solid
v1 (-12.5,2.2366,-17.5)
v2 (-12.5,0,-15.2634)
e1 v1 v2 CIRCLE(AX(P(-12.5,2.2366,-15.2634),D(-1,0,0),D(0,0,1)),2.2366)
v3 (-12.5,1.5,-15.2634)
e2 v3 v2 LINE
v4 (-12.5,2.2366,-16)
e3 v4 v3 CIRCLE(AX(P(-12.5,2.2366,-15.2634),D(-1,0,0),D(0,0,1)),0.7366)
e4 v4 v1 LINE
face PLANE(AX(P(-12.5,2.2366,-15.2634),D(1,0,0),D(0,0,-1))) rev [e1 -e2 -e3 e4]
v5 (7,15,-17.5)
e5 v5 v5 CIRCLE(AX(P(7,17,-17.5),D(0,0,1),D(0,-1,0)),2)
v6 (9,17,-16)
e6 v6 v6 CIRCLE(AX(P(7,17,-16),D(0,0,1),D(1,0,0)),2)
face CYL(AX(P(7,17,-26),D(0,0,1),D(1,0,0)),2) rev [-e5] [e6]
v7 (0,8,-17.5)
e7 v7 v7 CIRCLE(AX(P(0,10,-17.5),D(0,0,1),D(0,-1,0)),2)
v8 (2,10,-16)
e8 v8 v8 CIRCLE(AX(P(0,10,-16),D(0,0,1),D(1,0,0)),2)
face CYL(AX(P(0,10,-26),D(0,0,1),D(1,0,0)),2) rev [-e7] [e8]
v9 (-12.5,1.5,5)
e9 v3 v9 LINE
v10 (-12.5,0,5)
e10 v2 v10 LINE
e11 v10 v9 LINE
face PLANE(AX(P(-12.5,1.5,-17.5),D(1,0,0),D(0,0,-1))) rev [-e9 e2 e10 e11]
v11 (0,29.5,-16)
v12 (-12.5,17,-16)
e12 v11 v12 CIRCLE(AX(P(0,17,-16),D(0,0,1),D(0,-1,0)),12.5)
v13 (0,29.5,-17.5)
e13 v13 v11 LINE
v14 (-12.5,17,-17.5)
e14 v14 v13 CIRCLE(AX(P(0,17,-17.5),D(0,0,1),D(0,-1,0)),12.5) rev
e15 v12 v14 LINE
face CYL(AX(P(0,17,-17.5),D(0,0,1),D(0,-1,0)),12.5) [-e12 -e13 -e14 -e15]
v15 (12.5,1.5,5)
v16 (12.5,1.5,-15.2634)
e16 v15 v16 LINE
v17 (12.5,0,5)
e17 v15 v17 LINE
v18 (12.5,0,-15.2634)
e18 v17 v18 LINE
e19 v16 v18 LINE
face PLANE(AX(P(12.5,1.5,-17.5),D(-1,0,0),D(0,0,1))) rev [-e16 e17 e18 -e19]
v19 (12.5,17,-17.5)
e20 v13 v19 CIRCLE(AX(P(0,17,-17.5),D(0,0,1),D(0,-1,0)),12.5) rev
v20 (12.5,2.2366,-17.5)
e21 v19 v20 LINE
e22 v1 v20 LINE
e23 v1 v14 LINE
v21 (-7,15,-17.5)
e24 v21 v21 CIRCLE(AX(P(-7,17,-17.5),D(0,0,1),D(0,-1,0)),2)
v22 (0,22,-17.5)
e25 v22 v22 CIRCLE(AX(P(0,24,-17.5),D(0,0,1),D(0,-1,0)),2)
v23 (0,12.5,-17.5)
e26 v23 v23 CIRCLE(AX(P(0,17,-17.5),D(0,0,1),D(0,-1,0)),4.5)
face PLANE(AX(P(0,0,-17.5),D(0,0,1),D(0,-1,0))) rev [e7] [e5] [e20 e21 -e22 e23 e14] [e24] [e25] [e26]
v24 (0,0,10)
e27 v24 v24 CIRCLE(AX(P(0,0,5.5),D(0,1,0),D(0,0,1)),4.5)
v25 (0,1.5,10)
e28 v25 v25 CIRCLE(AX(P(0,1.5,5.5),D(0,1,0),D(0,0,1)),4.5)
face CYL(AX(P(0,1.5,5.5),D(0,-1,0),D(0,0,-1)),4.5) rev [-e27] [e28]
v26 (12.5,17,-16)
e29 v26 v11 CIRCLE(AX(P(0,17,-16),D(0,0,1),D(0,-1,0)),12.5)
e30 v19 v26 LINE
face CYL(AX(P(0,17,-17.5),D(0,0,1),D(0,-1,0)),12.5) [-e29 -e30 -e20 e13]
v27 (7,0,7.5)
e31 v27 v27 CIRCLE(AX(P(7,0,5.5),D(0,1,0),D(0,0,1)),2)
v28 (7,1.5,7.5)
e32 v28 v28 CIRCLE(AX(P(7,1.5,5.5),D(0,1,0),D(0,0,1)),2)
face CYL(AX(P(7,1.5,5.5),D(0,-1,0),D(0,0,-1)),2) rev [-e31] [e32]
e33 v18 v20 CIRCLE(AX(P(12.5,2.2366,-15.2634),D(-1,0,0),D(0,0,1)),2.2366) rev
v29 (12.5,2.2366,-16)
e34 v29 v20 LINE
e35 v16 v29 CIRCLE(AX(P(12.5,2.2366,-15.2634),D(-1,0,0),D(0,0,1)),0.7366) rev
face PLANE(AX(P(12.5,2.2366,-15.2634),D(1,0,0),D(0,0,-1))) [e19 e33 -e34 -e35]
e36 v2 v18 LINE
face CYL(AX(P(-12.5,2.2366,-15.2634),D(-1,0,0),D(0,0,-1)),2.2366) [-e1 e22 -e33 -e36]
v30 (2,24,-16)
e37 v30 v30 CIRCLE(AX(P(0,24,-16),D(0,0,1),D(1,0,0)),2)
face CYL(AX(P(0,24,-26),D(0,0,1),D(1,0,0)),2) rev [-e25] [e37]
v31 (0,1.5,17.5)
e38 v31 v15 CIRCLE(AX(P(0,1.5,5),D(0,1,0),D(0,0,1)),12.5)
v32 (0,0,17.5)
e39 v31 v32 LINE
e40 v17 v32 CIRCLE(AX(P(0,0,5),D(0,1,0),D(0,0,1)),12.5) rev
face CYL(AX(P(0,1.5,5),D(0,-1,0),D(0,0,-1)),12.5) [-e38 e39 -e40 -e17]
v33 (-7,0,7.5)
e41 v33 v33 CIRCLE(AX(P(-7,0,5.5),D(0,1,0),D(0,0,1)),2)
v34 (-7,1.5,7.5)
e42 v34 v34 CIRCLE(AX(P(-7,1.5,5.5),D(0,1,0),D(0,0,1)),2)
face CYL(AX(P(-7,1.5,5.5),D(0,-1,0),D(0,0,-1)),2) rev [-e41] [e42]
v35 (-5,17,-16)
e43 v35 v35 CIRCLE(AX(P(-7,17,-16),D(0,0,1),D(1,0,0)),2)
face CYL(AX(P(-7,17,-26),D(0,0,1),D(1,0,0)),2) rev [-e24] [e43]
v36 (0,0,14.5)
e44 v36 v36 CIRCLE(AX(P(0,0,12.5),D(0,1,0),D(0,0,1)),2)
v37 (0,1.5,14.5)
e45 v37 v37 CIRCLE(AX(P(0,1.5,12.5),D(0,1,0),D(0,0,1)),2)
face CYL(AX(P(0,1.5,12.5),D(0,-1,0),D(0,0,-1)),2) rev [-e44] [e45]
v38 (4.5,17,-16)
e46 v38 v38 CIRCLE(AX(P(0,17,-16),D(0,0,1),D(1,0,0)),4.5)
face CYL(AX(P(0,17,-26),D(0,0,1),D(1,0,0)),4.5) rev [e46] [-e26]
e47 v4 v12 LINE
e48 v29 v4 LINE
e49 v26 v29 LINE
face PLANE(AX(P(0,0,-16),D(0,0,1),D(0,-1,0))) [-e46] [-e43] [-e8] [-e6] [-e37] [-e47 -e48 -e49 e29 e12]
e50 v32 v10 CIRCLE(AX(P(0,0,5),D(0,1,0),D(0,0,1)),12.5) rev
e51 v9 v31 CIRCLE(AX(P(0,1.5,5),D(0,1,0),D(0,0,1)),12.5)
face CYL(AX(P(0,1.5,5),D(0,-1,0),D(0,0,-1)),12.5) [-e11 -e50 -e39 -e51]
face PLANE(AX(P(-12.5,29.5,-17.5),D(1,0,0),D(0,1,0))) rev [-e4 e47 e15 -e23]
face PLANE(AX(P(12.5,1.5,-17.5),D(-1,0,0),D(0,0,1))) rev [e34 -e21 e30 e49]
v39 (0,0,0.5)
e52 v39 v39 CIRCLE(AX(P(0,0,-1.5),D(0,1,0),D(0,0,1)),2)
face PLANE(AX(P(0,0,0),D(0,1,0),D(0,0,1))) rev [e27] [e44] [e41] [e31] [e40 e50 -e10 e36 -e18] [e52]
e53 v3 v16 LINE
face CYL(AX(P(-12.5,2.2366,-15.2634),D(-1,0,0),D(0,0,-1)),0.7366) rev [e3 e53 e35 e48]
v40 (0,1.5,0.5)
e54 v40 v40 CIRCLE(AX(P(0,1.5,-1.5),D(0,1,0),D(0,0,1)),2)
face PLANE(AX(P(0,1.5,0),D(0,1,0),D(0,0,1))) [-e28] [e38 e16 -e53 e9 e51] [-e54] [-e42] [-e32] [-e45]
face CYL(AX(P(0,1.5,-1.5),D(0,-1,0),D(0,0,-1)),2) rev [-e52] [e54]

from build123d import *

# Parameters (mm, degrees)
SKETCH1_W                    = 25
SKETCH1_H                    = 35
SKETCH1_R                    = 4.5
SKETCH1_R_2                  = 2
BASE_FLANGE1_DEPTH           = 1.5
EDGE_FLANGE1_STRIP_W         = 7.4732
EDGE_FLANGE1_STRIP_H         = 1.5
EDGE_FLANGE1_STRIP_CUT_DEPTH = 25
EDGE_FLANGE1_DEPTH           = 25
SKETCH9_R                    = 4.5
SKETCH9_R_2                  = 2
CUT_EXTRUDE1_DEPTH           = 10
FILLET1_R                    = 12.5


# Sheet-metal steps are written as plain solids
with BuildPart() as part:
    # Sketch1 → Base-Flange1 (new body)
    with BuildSketch(Plane(origin=(0, 0, 0), x_dir=(1, 0, 0), z_dir=(0, 1, 0))):
        Rectangle(SKETCH1_W, SKETCH1_H)
        with Locations(Location((0, -5.5, 0), (0, 0, 270))):
            Circle(SKETCH1_R, mode=Mode.SUBTRACT)
        with Locations(Location((-7, -5.5, 0), (0, 0, 270))):
            Circle(SKETCH1_R_2, mode=Mode.SUBTRACT)
        with Locations(Location((0, -12.5, 0), (0, 0, 270))):
            Circle(SKETCH1_R_2, mode=Mode.SUBTRACT)
        with Locations(Location((7, -5.5, 0), (0, 0, 270))):
            Circle(SKETCH1_R_2, mode=Mode.SUBTRACT)
        with Locations(Location((0, 1.5, 0), (0, 0, 270))):
            Circle(SKETCH1_R_2, mode=Mode.SUBTRACT)
    extrude(amount=BASE_FLANGE1_DEPTH)

    # Edge-Flange1 strip (across the edge) → Edge-Flange1 strip cut (cut)
    with BuildSketch(Plane(origin=(12.5, 1.5, -17.5), x_dir=(0, 0, 1), z_dir=(-1, 0, 0))):
        with Locations((-1.5, -0.75)):
            Rectangle(EDGE_FLANGE1_STRIP_W, EDGE_FLANGE1_STRIP_H)
    extrude(amount=EDGE_FLANGE1_STRIP_CUT_DEPTH, mode=Mode.SUBTRACT)

    # Edge-Flange1 section (across the edge) → Edge-Flange1 (add)
    with BuildSketch(Plane(origin=(12.5, 1.5, -17.5), x_dir=(0, 0, 1), z_dir=(-1, 0, 0))):
        with BuildLine():
            Line((0, 0.7366), (0, 28))
            Line((0, 28), (1.5, 28))
            Line((1.5, 28), (1.5, 0.7366))
            ThreePointArc((1.5, 0.7366), (1.715745145, 0.215745145), (2.2366, 0))
            Line((2.2366, 0), (2.2366, -1.5))
            ThreePointArc((2.2366, -1.5), (0.655084973, -0.844915027), (0, 0.7366))
        make_face()
    extrude(amount=EDGE_FLANGE1_DEPTH)

    # Sketch9 → Cut-Extrude1 (cut)
    with BuildSketch(Plane.XY.offset(-16)):
        with Locations((0, 17)):
            Circle(SKETCH9_R)
        with Locations((-7, 17)):
            Circle(SKETCH9_R_2)
        with Locations((7, 17)):
            Circle(SKETCH9_R_2)
        with Locations((0, 24)):
            Circle(SKETCH9_R_2)
        with Locations((0, 10)):
            Circle(SKETCH9_R_2)
    extrude(amount=-CUT_EXTRUDE1_DEPTH, mode=Mode.SUBTRACT)

    # Fillet1
    fillet1_edges = [part.edges().sort_by_distance(p)[0] for p in [
        (12.5, 0.75, 17.5),
        (-12.5, 0.75, 17.5),
        (12.5, 29.5, -16.75),
        (-12.5, 29.5, -16.75),
    ]]
    fillet(fillet1_edges, radius=FILLET1_R - 0.0001)  # a hair under: the kernel refuses the full size


solid = part.part
